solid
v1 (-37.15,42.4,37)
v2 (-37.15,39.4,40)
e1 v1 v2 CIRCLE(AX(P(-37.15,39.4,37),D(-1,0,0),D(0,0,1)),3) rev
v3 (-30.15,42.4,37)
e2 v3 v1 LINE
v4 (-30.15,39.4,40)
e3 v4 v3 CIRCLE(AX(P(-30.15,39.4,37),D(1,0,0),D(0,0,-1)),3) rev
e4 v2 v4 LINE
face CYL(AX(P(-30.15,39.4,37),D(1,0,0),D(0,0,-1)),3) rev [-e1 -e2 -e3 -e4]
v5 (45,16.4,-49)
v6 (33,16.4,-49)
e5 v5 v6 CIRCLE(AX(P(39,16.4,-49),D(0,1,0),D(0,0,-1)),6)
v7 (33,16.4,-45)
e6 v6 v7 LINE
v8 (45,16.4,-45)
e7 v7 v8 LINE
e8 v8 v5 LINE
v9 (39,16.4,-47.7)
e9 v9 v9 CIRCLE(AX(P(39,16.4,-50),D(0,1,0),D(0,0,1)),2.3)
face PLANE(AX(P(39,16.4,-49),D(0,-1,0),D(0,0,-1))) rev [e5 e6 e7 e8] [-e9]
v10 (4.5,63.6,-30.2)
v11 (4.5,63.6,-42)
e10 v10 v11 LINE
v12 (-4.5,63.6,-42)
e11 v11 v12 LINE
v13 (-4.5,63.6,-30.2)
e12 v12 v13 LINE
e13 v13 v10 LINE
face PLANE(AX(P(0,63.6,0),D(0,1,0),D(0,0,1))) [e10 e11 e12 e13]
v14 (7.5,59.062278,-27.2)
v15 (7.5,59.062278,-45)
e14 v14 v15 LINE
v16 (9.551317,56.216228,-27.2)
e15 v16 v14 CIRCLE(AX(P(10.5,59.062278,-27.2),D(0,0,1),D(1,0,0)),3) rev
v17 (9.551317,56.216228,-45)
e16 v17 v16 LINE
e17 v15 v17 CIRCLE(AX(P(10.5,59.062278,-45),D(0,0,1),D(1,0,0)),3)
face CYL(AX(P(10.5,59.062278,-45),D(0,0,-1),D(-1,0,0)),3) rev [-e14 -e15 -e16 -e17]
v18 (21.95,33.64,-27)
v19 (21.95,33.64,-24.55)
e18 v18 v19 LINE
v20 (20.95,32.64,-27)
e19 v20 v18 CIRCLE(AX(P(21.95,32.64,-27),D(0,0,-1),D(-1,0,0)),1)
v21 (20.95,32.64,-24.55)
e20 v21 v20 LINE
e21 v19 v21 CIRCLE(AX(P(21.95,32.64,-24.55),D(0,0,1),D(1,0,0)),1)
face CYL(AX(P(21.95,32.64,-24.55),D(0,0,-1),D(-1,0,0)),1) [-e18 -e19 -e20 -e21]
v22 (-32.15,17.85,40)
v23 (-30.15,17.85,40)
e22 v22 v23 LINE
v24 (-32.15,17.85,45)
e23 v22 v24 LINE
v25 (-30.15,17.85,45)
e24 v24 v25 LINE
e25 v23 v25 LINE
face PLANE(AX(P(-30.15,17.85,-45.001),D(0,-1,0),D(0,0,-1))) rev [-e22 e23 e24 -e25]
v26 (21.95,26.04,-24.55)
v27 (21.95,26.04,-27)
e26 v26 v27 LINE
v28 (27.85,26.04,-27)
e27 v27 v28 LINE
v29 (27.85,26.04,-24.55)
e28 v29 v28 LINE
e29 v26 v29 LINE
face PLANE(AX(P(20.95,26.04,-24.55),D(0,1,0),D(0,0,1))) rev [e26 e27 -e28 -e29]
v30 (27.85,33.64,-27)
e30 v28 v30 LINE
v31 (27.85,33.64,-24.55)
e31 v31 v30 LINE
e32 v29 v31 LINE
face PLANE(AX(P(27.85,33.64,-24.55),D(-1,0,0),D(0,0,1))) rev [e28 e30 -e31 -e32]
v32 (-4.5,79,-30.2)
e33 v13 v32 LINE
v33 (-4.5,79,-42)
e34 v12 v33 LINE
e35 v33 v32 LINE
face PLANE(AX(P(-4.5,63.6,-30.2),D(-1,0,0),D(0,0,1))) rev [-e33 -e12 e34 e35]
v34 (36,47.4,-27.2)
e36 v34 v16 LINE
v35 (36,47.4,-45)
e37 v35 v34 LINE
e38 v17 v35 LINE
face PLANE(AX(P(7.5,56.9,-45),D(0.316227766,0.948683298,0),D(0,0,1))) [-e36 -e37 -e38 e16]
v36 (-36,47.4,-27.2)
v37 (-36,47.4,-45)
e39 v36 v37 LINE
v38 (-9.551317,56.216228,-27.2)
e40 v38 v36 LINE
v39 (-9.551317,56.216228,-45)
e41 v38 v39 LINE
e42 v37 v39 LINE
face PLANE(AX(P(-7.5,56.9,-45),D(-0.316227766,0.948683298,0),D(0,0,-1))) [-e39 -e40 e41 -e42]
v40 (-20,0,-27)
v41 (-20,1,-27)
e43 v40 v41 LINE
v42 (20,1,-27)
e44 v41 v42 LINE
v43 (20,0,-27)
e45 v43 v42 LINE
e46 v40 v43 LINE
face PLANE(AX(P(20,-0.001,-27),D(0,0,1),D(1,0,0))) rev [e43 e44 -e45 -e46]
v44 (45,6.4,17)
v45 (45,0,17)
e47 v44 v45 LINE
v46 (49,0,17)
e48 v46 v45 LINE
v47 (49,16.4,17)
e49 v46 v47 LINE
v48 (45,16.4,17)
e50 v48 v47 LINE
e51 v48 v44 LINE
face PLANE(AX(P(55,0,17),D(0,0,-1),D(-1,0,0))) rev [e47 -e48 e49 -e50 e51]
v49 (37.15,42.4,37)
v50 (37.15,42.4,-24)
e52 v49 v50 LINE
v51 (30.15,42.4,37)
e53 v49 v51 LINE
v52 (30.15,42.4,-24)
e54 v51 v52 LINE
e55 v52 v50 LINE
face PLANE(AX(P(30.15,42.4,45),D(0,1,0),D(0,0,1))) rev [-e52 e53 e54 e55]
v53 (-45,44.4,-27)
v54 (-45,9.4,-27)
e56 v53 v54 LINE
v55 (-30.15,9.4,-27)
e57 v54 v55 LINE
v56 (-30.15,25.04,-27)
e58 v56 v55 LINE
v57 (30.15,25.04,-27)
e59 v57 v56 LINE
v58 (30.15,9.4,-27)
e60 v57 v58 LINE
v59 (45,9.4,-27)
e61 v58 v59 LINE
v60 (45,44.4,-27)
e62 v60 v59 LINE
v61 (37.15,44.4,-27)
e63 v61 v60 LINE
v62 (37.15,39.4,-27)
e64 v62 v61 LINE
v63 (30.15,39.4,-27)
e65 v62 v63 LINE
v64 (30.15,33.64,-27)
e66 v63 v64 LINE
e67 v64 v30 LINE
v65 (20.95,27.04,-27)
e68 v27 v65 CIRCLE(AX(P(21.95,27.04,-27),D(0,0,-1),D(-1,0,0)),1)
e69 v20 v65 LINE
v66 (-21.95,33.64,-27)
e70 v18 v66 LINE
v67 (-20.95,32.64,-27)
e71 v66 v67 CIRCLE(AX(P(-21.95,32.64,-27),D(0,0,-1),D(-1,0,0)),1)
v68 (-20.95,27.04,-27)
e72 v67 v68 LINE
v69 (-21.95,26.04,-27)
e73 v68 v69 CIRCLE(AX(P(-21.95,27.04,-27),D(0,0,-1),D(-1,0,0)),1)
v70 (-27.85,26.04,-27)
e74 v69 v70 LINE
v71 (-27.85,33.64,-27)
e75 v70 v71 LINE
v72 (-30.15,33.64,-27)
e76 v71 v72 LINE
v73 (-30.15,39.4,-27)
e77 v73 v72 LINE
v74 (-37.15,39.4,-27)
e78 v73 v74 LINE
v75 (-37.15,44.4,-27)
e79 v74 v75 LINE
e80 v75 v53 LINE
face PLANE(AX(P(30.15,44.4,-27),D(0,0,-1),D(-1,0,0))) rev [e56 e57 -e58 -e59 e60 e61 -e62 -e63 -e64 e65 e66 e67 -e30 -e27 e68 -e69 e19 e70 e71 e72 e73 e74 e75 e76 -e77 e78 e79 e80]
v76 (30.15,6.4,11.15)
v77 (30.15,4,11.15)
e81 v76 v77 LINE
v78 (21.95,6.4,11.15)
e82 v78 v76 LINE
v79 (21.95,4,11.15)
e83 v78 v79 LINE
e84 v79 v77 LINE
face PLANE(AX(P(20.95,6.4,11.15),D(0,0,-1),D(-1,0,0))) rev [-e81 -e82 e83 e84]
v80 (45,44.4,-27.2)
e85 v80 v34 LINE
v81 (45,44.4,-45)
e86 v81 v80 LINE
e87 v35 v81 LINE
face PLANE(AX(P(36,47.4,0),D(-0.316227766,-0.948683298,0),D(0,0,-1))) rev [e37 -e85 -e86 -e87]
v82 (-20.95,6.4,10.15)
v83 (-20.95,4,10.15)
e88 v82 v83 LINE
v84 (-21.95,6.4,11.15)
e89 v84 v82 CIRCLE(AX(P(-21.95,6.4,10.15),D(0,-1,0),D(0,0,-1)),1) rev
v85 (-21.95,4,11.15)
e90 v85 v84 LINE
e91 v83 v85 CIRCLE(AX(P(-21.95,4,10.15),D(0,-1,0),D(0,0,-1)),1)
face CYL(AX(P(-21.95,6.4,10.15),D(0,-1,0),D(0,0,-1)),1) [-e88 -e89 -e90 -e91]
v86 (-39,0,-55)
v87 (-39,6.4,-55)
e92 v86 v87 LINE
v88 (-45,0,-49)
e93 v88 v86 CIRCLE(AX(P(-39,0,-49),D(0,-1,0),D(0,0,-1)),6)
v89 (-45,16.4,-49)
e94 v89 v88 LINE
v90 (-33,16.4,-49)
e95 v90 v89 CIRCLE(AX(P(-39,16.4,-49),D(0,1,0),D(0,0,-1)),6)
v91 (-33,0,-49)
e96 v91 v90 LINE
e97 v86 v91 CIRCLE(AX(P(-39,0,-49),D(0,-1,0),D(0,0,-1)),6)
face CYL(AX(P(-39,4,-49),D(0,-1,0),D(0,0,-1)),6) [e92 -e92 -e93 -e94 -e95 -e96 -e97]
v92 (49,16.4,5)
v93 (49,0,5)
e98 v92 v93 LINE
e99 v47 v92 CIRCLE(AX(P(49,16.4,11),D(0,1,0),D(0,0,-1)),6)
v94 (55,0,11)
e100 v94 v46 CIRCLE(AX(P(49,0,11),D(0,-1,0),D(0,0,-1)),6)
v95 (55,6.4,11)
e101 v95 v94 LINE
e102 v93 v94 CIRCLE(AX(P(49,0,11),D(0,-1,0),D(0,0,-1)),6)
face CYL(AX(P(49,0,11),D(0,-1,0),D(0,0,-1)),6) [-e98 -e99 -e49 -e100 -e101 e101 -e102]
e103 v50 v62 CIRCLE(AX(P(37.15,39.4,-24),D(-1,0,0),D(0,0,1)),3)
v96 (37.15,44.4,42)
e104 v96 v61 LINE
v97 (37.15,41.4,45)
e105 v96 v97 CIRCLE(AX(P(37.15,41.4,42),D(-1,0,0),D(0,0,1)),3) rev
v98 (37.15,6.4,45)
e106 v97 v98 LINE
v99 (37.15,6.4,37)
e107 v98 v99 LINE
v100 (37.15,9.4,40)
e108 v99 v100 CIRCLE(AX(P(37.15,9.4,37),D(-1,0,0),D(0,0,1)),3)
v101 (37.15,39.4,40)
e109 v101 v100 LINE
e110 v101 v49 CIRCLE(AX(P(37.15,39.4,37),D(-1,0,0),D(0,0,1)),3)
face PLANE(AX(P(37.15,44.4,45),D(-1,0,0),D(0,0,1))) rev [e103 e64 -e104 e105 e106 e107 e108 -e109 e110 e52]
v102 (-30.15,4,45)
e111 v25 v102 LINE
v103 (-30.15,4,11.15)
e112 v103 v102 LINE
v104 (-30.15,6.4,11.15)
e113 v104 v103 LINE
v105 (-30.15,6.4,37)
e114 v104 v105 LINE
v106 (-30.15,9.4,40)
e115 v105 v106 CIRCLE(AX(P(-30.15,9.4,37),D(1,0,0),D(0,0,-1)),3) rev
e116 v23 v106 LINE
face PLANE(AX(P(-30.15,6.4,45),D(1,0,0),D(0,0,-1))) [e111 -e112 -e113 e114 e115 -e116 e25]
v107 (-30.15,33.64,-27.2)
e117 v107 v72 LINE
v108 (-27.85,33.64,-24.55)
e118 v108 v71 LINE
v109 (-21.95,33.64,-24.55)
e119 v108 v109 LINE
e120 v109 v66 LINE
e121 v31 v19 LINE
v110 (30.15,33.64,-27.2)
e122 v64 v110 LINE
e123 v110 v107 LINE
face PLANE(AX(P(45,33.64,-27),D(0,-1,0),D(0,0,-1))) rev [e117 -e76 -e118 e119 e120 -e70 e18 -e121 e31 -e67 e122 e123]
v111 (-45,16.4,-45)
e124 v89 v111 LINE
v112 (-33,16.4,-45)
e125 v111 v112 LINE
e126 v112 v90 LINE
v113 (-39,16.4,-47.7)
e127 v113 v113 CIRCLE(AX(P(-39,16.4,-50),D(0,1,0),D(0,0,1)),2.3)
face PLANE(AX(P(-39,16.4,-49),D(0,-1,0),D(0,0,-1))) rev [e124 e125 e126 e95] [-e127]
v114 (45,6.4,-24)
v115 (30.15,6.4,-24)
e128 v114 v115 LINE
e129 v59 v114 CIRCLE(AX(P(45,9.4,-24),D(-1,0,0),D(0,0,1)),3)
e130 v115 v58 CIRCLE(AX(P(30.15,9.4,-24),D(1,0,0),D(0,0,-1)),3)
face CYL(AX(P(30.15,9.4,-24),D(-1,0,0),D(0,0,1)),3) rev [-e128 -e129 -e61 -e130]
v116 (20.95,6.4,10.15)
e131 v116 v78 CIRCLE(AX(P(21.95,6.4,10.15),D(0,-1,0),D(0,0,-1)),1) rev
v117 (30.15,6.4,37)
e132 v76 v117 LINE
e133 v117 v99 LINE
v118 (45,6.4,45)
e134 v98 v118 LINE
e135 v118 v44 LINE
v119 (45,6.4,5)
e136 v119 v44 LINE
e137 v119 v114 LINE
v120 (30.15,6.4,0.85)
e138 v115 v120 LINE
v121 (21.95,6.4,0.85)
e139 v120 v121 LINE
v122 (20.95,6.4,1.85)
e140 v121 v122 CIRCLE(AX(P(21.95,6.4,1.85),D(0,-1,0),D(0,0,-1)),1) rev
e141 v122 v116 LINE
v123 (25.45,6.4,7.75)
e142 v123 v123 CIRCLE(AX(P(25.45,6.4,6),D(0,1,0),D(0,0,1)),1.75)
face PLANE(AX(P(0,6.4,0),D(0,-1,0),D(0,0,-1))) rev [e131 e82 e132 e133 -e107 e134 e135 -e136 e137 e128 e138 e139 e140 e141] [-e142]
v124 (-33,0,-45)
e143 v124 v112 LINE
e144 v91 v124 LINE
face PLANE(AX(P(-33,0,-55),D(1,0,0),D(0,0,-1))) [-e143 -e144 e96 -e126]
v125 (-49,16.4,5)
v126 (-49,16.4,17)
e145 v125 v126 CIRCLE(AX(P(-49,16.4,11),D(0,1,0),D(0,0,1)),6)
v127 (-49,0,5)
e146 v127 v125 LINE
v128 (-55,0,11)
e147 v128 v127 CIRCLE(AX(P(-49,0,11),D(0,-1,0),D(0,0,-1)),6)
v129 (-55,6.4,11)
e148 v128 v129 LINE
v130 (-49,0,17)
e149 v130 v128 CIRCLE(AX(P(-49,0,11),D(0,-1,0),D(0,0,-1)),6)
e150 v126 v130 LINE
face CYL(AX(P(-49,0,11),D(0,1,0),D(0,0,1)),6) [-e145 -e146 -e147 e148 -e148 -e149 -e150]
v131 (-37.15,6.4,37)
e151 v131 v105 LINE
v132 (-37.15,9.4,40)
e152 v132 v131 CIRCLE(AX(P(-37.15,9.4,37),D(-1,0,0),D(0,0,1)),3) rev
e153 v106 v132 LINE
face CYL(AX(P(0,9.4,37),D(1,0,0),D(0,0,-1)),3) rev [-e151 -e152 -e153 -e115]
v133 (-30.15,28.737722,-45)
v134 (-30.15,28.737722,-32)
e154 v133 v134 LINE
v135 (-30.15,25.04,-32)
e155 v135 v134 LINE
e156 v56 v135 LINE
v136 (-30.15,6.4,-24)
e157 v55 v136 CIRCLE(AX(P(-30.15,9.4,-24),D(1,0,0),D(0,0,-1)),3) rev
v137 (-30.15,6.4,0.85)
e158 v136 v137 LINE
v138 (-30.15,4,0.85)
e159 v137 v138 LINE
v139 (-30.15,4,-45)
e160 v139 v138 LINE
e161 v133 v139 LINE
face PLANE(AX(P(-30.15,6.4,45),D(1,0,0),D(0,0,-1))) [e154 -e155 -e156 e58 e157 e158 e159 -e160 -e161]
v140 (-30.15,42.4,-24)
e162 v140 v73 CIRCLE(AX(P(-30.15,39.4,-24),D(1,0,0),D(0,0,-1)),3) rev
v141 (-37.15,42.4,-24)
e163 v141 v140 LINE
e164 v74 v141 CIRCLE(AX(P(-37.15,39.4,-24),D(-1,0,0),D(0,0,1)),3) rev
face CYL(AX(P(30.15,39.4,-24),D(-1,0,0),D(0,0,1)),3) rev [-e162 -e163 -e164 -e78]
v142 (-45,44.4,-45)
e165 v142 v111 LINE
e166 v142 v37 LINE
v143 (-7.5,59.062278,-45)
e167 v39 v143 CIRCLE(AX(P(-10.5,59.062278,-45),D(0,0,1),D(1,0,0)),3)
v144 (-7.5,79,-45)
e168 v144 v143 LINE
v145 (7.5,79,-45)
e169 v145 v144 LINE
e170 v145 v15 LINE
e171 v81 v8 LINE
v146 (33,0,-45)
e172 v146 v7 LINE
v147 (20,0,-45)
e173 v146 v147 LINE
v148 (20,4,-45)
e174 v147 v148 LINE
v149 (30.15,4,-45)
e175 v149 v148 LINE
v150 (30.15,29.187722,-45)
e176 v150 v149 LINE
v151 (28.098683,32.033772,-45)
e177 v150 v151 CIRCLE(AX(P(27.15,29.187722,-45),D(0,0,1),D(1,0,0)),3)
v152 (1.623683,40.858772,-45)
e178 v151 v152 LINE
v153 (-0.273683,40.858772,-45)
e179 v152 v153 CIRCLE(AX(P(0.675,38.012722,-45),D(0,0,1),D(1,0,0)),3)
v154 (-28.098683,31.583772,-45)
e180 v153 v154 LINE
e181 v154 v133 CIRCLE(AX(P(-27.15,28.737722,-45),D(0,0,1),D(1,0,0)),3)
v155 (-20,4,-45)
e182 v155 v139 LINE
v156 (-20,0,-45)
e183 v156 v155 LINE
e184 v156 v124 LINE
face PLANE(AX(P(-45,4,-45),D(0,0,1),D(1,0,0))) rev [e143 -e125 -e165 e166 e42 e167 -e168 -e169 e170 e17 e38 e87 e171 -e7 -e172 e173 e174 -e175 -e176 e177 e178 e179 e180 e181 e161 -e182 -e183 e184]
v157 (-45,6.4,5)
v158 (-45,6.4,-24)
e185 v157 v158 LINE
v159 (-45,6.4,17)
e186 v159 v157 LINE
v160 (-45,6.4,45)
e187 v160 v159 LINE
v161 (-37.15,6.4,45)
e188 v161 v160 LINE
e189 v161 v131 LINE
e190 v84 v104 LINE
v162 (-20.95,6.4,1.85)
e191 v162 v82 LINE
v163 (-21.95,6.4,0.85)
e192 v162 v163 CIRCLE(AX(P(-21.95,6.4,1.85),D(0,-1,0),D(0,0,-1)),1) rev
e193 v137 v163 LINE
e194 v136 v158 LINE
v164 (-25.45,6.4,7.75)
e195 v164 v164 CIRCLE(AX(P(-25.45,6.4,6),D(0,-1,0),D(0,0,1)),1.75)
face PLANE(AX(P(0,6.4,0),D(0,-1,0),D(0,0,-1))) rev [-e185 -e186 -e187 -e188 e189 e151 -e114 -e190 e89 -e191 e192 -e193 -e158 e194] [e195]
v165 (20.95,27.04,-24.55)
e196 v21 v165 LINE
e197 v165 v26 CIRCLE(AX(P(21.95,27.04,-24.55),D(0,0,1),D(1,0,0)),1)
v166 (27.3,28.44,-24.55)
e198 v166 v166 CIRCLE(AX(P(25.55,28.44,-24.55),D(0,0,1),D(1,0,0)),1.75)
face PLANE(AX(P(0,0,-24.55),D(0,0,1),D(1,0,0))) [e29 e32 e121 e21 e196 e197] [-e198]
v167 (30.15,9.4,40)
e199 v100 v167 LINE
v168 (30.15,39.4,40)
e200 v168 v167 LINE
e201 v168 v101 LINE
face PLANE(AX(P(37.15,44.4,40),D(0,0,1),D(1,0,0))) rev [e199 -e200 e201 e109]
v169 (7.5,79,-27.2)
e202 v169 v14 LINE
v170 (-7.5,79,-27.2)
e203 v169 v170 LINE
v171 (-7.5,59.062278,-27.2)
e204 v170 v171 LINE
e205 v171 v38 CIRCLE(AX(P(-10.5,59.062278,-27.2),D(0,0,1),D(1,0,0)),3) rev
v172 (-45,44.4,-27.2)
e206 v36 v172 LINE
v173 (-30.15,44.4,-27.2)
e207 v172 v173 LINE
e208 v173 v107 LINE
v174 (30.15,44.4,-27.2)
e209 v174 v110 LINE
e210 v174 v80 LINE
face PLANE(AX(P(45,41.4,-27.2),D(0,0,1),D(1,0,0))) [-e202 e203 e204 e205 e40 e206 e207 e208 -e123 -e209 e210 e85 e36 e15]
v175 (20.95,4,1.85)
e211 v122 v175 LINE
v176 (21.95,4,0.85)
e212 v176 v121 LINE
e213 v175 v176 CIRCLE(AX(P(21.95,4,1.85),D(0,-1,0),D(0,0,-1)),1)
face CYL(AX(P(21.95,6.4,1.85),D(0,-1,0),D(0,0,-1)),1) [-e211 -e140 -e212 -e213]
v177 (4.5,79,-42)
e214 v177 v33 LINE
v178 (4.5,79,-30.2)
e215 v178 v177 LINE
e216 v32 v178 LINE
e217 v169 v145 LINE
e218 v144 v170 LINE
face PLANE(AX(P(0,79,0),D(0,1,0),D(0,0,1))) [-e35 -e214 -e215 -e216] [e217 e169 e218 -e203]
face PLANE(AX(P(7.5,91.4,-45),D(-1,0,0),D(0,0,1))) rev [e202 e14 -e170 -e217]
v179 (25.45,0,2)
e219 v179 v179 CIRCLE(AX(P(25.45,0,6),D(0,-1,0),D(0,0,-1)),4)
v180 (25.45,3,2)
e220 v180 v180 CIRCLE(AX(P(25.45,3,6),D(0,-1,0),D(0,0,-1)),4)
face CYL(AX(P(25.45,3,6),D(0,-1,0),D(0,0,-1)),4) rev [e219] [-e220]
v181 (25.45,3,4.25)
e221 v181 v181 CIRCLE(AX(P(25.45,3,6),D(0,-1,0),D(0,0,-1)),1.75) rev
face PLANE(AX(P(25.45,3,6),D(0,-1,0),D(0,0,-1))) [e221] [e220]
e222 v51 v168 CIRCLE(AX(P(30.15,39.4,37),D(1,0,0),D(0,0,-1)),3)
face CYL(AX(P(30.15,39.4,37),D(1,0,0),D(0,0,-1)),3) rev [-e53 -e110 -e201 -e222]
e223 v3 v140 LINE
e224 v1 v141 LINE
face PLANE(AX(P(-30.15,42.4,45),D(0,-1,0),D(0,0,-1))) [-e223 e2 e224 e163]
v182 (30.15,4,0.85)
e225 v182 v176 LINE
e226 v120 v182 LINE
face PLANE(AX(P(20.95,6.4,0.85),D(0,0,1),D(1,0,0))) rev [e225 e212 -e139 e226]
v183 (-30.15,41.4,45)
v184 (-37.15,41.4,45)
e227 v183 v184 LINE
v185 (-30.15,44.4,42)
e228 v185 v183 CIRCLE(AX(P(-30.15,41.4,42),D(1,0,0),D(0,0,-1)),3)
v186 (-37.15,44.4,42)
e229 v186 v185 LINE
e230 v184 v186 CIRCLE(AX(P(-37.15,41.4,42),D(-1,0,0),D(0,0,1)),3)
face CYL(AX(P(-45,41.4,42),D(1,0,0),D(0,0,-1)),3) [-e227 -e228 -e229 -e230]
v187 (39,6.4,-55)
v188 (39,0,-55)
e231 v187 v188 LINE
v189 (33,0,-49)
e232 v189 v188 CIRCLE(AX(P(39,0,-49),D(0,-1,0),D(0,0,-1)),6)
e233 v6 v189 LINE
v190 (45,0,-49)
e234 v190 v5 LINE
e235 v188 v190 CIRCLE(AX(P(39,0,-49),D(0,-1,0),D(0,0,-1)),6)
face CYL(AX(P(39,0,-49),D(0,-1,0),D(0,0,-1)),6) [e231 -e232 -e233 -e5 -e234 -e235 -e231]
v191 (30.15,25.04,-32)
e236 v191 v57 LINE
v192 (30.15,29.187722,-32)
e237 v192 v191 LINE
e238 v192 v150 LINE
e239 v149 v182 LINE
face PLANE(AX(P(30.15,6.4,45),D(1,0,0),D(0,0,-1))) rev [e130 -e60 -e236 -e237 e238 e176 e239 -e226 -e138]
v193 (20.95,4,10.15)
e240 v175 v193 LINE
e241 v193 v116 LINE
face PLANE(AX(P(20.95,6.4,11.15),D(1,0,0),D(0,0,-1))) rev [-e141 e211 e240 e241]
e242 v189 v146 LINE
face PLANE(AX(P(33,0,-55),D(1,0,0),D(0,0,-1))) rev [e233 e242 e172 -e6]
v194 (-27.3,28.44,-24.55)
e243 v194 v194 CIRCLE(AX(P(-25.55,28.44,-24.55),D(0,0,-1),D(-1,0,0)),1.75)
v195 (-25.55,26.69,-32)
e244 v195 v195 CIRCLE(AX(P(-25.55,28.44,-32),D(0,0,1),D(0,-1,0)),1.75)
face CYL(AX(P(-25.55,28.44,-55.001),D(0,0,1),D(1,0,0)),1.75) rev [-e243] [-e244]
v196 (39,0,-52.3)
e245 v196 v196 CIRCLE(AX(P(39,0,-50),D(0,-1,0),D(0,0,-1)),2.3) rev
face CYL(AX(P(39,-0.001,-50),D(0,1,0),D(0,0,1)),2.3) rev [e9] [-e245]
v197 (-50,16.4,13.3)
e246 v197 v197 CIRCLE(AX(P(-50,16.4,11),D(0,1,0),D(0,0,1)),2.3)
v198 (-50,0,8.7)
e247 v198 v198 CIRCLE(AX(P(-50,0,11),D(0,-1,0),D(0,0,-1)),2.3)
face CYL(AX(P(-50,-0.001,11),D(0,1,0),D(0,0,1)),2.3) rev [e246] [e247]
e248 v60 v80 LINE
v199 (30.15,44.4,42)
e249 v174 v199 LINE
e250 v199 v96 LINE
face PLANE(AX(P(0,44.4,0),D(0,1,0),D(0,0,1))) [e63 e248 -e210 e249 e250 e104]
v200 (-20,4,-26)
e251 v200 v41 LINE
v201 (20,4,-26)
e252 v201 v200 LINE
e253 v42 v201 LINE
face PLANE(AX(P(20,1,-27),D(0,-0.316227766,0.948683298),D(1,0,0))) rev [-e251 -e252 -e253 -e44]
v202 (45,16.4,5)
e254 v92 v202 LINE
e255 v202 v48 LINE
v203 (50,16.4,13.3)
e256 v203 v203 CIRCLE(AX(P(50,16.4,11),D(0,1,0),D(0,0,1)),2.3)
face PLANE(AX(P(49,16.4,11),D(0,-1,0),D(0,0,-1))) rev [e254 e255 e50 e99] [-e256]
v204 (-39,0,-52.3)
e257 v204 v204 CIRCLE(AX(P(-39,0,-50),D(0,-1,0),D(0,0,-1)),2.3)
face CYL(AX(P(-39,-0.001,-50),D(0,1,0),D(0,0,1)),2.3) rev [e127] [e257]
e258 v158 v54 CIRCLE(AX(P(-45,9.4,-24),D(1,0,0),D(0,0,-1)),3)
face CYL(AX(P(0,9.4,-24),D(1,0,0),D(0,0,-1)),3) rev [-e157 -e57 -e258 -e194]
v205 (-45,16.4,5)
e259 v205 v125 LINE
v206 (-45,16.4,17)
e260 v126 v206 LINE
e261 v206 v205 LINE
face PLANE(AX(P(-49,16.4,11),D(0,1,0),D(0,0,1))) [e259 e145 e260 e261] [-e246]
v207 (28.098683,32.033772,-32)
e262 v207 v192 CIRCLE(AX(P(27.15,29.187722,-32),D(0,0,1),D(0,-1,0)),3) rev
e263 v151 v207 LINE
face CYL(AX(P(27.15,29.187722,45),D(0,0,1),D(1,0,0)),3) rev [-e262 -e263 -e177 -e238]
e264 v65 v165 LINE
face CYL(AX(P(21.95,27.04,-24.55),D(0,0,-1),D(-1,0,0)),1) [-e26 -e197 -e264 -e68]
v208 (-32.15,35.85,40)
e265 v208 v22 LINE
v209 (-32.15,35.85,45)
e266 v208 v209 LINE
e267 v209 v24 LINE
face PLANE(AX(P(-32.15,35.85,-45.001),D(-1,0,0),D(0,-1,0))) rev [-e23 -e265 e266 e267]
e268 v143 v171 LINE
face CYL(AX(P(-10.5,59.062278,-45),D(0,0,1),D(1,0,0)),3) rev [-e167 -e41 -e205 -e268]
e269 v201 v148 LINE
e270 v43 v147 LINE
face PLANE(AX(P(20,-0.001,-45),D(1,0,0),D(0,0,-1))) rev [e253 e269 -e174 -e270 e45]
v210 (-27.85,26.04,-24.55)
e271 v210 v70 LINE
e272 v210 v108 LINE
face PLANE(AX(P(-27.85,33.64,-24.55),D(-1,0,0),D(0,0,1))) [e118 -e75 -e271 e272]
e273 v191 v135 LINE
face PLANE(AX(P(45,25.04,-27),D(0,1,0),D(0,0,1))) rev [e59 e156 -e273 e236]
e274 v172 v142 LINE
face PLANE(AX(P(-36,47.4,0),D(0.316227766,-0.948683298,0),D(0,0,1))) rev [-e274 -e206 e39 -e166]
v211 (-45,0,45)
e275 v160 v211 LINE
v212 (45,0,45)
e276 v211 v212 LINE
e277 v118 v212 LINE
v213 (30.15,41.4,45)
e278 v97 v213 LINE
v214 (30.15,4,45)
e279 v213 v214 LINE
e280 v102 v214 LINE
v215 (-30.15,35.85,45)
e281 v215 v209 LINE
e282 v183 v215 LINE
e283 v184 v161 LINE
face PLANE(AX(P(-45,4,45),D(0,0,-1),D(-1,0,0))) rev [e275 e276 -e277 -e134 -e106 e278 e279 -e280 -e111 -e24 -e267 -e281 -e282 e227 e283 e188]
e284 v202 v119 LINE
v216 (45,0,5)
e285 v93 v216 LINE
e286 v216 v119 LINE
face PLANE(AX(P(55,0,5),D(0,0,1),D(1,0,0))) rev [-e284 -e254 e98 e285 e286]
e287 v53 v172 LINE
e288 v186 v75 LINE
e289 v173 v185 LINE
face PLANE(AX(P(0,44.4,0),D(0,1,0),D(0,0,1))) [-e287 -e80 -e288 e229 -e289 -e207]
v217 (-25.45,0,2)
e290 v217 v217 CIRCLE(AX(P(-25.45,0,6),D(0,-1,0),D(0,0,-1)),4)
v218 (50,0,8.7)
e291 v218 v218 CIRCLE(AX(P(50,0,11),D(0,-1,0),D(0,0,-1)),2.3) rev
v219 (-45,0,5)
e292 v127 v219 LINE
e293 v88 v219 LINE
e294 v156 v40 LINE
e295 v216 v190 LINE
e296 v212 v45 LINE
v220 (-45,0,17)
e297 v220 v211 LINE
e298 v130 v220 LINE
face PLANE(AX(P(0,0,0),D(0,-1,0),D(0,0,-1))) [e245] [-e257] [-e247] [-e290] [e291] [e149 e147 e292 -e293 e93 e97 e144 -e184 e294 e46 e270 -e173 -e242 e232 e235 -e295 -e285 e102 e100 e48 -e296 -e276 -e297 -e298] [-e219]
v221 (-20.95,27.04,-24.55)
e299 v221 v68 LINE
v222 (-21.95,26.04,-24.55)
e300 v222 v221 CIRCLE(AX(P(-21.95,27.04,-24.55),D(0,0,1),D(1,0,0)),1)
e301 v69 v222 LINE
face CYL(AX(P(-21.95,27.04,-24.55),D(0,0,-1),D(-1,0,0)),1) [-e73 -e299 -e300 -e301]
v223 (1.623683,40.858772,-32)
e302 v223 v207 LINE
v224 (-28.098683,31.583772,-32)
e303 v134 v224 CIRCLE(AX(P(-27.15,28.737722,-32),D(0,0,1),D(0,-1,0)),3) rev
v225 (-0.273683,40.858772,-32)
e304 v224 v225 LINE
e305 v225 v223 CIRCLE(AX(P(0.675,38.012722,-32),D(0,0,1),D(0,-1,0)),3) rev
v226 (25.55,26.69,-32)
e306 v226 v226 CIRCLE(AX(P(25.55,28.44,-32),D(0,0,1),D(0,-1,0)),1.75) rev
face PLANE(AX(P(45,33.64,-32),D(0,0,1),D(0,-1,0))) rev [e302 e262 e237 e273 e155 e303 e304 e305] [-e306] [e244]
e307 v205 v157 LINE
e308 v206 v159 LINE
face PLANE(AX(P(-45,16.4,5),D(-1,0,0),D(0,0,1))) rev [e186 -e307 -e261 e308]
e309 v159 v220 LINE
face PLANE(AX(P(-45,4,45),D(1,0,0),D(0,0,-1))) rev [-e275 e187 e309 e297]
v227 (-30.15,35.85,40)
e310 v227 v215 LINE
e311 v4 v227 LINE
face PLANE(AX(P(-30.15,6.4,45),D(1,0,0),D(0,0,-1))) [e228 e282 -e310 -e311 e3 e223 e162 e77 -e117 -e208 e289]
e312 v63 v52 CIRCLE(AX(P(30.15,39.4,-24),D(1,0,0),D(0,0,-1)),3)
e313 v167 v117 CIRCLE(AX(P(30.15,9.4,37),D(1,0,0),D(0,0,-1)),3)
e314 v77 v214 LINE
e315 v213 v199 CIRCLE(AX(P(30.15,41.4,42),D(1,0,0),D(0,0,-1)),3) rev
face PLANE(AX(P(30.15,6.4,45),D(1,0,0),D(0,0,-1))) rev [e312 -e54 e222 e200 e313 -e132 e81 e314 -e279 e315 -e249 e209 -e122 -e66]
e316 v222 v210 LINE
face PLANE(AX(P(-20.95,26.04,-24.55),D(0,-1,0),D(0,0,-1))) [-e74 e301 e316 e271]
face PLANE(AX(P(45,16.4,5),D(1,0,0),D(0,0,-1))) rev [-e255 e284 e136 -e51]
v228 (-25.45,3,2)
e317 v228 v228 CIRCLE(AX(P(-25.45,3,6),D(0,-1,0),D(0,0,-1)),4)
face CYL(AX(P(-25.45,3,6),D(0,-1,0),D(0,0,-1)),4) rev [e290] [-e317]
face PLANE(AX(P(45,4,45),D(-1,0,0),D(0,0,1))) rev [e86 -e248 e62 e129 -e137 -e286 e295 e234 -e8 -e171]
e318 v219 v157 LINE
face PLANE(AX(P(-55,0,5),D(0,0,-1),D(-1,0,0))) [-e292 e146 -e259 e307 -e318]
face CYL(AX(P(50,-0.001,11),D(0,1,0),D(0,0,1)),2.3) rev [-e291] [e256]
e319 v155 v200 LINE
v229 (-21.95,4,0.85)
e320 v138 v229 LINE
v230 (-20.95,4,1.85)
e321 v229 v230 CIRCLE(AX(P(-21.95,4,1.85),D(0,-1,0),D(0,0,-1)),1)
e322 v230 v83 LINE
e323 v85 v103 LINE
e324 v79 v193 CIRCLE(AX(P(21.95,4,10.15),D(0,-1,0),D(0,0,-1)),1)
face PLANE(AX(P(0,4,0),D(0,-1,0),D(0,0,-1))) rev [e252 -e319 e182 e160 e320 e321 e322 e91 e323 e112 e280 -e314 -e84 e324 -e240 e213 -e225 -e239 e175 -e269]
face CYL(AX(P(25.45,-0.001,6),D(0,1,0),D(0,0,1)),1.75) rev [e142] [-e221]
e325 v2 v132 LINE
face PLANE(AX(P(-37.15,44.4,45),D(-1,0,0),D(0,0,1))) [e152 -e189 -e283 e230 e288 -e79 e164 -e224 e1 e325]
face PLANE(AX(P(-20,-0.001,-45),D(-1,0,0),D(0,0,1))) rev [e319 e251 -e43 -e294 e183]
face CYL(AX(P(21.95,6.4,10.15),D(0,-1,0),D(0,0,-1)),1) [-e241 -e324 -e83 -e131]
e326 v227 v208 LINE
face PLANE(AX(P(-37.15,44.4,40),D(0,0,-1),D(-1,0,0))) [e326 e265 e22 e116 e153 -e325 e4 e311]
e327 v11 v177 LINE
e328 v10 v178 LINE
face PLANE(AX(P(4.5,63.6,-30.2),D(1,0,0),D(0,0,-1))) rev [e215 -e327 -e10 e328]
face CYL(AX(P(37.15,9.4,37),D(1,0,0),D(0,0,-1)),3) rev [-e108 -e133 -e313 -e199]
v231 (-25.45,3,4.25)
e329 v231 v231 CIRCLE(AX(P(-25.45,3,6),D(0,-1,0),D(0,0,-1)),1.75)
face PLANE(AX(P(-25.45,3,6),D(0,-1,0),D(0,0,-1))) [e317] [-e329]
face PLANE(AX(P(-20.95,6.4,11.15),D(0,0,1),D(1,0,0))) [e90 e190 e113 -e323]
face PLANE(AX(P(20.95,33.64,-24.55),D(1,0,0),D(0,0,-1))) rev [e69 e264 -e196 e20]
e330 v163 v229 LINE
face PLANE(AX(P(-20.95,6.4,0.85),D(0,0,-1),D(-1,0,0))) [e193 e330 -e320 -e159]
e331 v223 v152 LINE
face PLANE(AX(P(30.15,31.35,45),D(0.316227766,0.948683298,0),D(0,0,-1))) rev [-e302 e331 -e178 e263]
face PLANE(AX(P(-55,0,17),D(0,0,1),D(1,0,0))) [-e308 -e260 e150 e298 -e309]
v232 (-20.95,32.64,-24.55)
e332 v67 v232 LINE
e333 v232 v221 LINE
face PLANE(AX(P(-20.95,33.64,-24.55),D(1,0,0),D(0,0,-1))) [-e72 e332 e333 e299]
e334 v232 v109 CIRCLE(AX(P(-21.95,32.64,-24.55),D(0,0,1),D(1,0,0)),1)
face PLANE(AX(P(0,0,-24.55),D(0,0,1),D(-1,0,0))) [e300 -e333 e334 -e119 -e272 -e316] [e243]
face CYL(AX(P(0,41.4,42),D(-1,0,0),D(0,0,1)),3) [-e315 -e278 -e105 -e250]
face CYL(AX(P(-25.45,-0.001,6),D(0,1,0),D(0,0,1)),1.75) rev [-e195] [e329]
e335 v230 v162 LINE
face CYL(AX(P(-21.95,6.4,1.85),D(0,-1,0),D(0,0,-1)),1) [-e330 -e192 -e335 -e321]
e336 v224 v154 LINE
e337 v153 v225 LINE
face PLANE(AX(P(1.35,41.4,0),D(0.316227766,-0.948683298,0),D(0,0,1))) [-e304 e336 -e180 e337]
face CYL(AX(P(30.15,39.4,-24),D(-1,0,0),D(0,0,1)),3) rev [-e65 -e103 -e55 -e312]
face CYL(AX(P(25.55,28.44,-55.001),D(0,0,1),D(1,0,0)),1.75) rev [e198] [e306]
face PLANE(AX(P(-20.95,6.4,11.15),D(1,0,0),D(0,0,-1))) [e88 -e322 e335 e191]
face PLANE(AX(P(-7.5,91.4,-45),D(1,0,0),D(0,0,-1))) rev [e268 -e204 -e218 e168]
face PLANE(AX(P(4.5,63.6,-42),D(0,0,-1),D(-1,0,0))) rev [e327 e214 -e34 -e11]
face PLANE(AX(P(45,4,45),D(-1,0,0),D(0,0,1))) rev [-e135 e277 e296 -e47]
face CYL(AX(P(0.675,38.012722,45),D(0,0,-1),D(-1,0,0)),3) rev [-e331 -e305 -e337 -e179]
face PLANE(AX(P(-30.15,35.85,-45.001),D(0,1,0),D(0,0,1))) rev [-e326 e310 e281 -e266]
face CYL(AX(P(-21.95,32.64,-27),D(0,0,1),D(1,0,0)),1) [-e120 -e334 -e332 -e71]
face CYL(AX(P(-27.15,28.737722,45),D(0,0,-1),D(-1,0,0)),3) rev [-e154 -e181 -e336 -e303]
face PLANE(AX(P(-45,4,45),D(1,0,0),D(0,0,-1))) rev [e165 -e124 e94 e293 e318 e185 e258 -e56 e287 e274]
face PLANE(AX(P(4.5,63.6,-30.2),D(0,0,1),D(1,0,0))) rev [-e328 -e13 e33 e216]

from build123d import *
from OCP.BRepFilletAPI import BRepFilletAPI_MakeChamfer

# Parameters (mm, degrees)
ESQUISSE2_W              = 90
ESQUISSE2_H              = 90
BOSS_EXTRU_1_DEPTH       = 4
ESQUISSE3_W              = 9.2
ESQUISSE3_H              = 10.3
BOSS_EXTRU_2_DEPTH       = 2.4
CONG_1_R                 = 1
ESQUISSE5_W              = 14.85
ESQUISSE5_H              = 90
BOSS_EXTRU_3_DEPTH       = 2.4
ESQUISSE6_W              = 7
ESQUISSE6_H              = 5
BOSS_EXTRU_4_DEPTH       = 38
ESQUISSE8_W              = 14.85
ESQUISSE8_H              = 18
BOSS_EXTRU_5_DEPTH       = 38
BOSS_EXTRU_6_REACH       = 97.814
ESQUISSE9_W              = 7
ESQUISSE9_H              = 2
CONG_1_OF_SYM_TRIE1_R    = 1
ENL_V_MAT_EXTRU_1_REACH  = 111.983
ESQUISSE10_W             = 2
ESQUISSE10_H             = 18
ENL_V_MAT_EXTRU_2_REACH  = 77.38
ESQUISSE11_W             = 40
ESQUISSE11_H             = 18
BOSS_EXTRU_7_REACH       = 100.203
ESQUISSE12_W             = 5
ESQUISSE12_H             = 8.6
ESQUISSE13_W             = 6.9
ESQUISSE13_H             = 7.6
BOSS_EXTRU_8_DEPTH       = 2.45
CONG_2_R                 = 1
CONG_2_OF_SYM_TRIE2_R    = 1
BOSS_EXTRU_9_DEPTH       = 3
BOSS_EXTRU_9_DEPTH_BACK  = 3
ESQUISSE14_W             = 90
ESQUISSE14_H             = 17.8
ESQUISSE15_W             = 15
ESQUISSE15_H             = 17.8
BOSS_EXTRU_10_DEPTH      = 44
ESQUISSE16_W             = 90
ESQUISSE16_H             = 90
BOSS_EXTRU_11_DEPTH      = 11.6
ESQUISSE20_W             = 12
ESQUISSE20_H             = 6.4
BOSS_EXTRU_13_DEPTH      = 10
ESQUISSE21_W             = 12
ESQUISSE21_H             = 6.4
BOSS_EXTRU_14_DEPTH      = 10
CONG_3_R                 = 6
ENL_V_MAT_EXTRU_4_REACH  = 126.022
ESQUISSE23_R             = 2.3
CONG_3_OF_SYM_TRIE3_R    = 6
ENL_V_MAT_EXTRU_5_REACH  = 126.022
ESQUISSE24_R             = 1.75
ENL_V_MAT_EXTRU_6_REACH  = 137.909
ESQUISSE26_R             = 1.75
ESQUISSE27_W             = 50
ESQUISSE27_H             = 4
ENL_V_MAT_EXTRU_7_DEPTH  = 72.2
CHANFREIN3_SIZE          = 28.5
CHANFREIN3_SIZE2         = 9.5
CHANFREIN4_SIZE          = 10
CHANFREIN4_SIZE2         = 17.5
CHANFREIN8_START         = -45
CHANFREIN8_DEPTH         = 17.8
CHANFREIN9_SIZE          = 3
CHANFREIN9_SIZE_2        = 9
CHANFREIN10_START        = 25.930676813
CHANFREIN10_OUTLINE_W    = 40
CHANFREIN10_OUTLINE_H    = 3.16227766
CHANFREIN10_DEPTH        = 2.069323187
CONG_9_R                 = 3
ESQUISSE37_R             = 4
ENL_V_MAT_EXTRU_8_DEPTH  = 3
BOSS_EXTRU_15_DEPTH      = 4.8
CONG_11_R                = 3
CHANFREIN14_SIZE         = 10
CHANFREIN14_SIZE2        = 5
ESQUISSE40_W             = 90
ESQUISSE40_H             = 90
ENL_V_MAT_EXTRU_9_DEPTH  = 24
ESQUISSE41_W             = 9
ESQUISSE41_H             = 11.8
ENL_V_MAT_EXTRU_11_DEPTH = 15.4
BOSS_EXTRU_16_START      = 10
ESQUISSE42_R             = 2.3
BOSS_EXTRU_16_DEPTH      = 10


with BuildPart() as part:
    # Esquisse2 → Boss.-Extru.1 (new body)
    with BuildSketch(Plane(origin=(0, 0, 0), x_dir=(1, 0, 0), z_dir=(0, 1, 0))):
        Rectangle(ESQUISSE2_W, ESQUISSE2_H)
    extrude(amount=BOSS_EXTRU_1_DEPTH)

    # Esquisse3 → Boss.-Extru.2 (add)
    with BuildSketch(Plane(origin=(0, 4, 0), x_dir=(1, 0, 0), z_dir=(0, 1, 0))):
        with Locations((25.55, -6)):
            Rectangle(ESQUISSE3_W, ESQUISSE3_H)
    boss_extru_2 = extrude(amount=BOSS_EXTRU_2_DEPTH)

    # Congé1
    cong_1_edges = [part.edges().sort_by_distance(p)[0] for p in [
        (20.95, 5.2, 0.85),
        (20.95, 5.2, 11.15),
    ]]
    fillet(cong_1_edges, radius=CONG_1_R)

    # Esquisse5 → Boss.-Extru.3 (add)
    with BuildSketch(Plane(origin=(0, 4, 0), x_dir=(1, 0, 0), z_dir=(0, 1, 0))):
        with Locations((37.575, 0)):
            Rectangle(ESQUISSE5_W, ESQUISSE5_H)
    boss_extru_3 = extrude(amount=BOSS_EXTRU_3_DEPTH)

    # Esquisse6 → Boss.-Extru.4 (add)
    with BuildSketch(Plane(origin=(0, 6.4, 0), x_dir=(1, 0, 0), z_dir=(0, 1, 0))):
        with Locations((33.65, -42.5)):
            Rectangle(ESQUISSE6_W, ESQUISSE6_H)
    boss_extru_4 = extrude(amount=BOSS_EXTRU_4_DEPTH)

    # Esquisse8 → Boss.-Extru.5 (add)
    with BuildSketch(Plane(origin=(0, 6.4, 0), x_dir=(1, 0, 0), z_dir=(0, 1, 0))):
        with Locations((37.575, 36)):
            Rectangle(ESQUISSE8_W, ESQUISSE8_H)
    boss_extru_5 = extrude(amount=BOSS_EXTRU_5_DEPTH)

    # Esquisse9 → Boss.-Extru.6 (add, up to next)
    with BuildSketch(Plane.XY.offset(-27), mode=Mode.PRIVATE) as boss_extru_6_sk1:
        with Locations((33.65, 43.4)):
            Rectangle(ESQUISSE9_W, ESQUISSE9_H)
    boss_extru_6_tool1 = extrude(boss_extru_6_sk1.sketch, amount=BOSS_EXTRU_6_REACH, mode=Mode.PRIVATE) - part.part
    boss_extru_6 = boss_extru_6_tool1.solids().sort_by_distance((33.65, 43.4, -27))[0]
    add(boss_extru_6)

    # Symétrie1: Boss.-Extru.2, Boss.-Extru.3, Boss.-Extru.4, Boss.-Extru.5, Boss.-Extru.6 across plane
    add(boss_extru_2.mirror(Plane(origin=(0, 0, 0), x_dir=(0, 0, 1), z_dir=(1, 0, 0))))
    add(boss_extru_3.mirror(Plane(origin=(0, 0, 0), x_dir=(0, 0, 1), z_dir=(1, 0, 0))))
    add(boss_extru_4.mirror(Plane(origin=(0, 0, 0), x_dir=(0, 0, 1), z_dir=(1, 0, 0))))
    add(boss_extru_5.mirror(Plane(origin=(0, 0, 0), x_dir=(0, 0, 1), z_dir=(1, 0, 0))))
    add(boss_extru_6.mirror(Plane(origin=(0, 0, 0), x_dir=(0, 0, 1), z_dir=(1, 0, 0))))

    # Congé1 of Symétrie1
    cong_1_of_sym_trie1_edges = [part.edges().sort_by_distance(p)[0] for p in [
        (-20.95, 5.2, 0.85),
        (-20.95, 5.2, 11.15),
    ]]
    fillet(cong_1_of_sym_trie1_edges, radius=CONG_1_OF_SYM_TRIE1_R)

    # Esquisse10 → Enlèv. mat.-Extru.1 (cut, up to next)
    with BuildSketch(Plane.XY.offset(45), mode=Mode.PRIVATE) as enl_v_mat_extru_1_sk1:
        with Locations((-31.15, 26.85)):
            Rectangle(ESQUISSE10_W, ESQUISSE10_H)
    enl_v_mat_extru_1_tool1 = extrude(enl_v_mat_extru_1_sk1.sketch, amount=-ENL_V_MAT_EXTRU_1_REACH, mode=Mode.PRIVATE) & part.part
    add(enl_v_mat_extru_1_tool1.solids().sort_by_distance((-31.15, 26.85, 45))[0], mode=Mode.SUBTRACT)

    # Esquisse11 → Enlèv. mat.-Extru.2 (cut, up to next)
    with BuildSketch(Plane(origin=(0, 4, 0), x_dir=(1, 0, 0), z_dir=(0, 1, 0)), mode=Mode.PRIVATE) as enl_v_mat_extru_2_sk1:
        with Locations((0, 36)):
            Rectangle(ESQUISSE11_W, ESQUISSE11_H)
    enl_v_mat_extru_2_tool1 = extrude(enl_v_mat_extru_2_sk1.sketch, amount=-ENL_V_MAT_EXTRU_2_REACH, mode=Mode.PRIVATE) & part.part
    add(enl_v_mat_extru_2_tool1.solids().sort_by_distance((0, 4, -36))[0], mode=Mode.SUBTRACT)

    # Esquisse12 → Boss.-Extru.7 (add, up to next)
    with BuildSketch(Plane(origin=(-30.15, 0, 0), x_dir=(0, 0, -1), z_dir=(1, 0, 0)), mode=Mode.PRIVATE) as boss_extru_7_sk1:
        with Locations((29.5, 29.34)):
            Rectangle(ESQUISSE12_W, ESQUISSE12_H)
    boss_extru_7_tool1 = extrude(boss_extru_7_sk1.sketch, amount=BOSS_EXTRU_7_REACH, mode=Mode.PRIVATE) - part.part
    add(boss_extru_7_tool1.solids().sort_by_distance((-30.15, 29.34, -29.5))[0])

    # Esquisse13 → Boss.-Extru.8 (add)
    with BuildSketch(Plane.XY.offset(-27)):
        with Locations((24.4, 29.84)):
            Rectangle(ESQUISSE13_W, ESQUISSE13_H)
    boss_extru_8 = extrude(amount=BOSS_EXTRU_8_DEPTH)

    # Congé2
    cong_2_edges = [part.edges().sort_by_distance(p)[0] for p in [
        (20.95, 33.64, -25.775),
        (20.95, 26.04, -25.775),
    ]]
    fillet(cong_2_edges, radius=CONG_2_R)

    # Symétrie2: Boss.-Extru.8 across plane
    add(boss_extru_8.mirror(Plane(origin=(0, 0, 0), x_dir=(0, 0, 1), z_dir=(1, 0, 0))))

    # Congé2 of Symétrie2
    cong_2_of_sym_trie2_edges = [part.edges().sort_by_distance(p)[0] for p in [
        (-20.95, 33.64, -25.775),
        (-20.95, 26.04, -25.775),
    ]]
    fillet(cong_2_of_sym_trie2_edges, radius=CONG_2_OF_SYM_TRIE2_R)

    # Esquisse14 → Boss.-Extru.9 (add, two sides: drawn at the far end of the back side and taken through both)
    with BuildSketch(Plane(origin=(0, 44.4, 0), x_dir=(1, 0, 0), z_dir=(0, 1, 0)).offset(-BOSS_EXTRU_9_DEPTH_BACK)):
        with Locations((0, 36.1)):
            Rectangle(ESQUISSE14_W, ESQUISSE14_H)
    extrude(amount=BOSS_EXTRU_9_DEPTH + BOSS_EXTRU_9_DEPTH_BACK)

    # Esquisse15 → Boss.-Extru.10 (add)
    with BuildSketch(Plane(origin=(0, 47.4, 0), x_dir=(1, 0, 0), z_dir=(0, 1, 0))):
        with Locations((0, 36.1)):
            Rectangle(ESQUISSE15_W, ESQUISSE15_H)
    extrude(amount=BOSS_EXTRU_10_DEPTH)

    # Esquisse16 → Boss.-Extru.11 (add)
    with BuildSketch(Plane(origin=(0, 91.4, 0), x_dir=(1, 0, 0), z_dir=(0, 1, 0))):
        Rectangle(ESQUISSE16_W, ESQUISSE16_H)
    extrude(amount=BOSS_EXTRU_11_DEPTH)

    # Esquisse20 → Boss.-Extru.13 (add)
    with BuildSketch(Plane(origin=(45, 0, 0), x_dir=(0, 0, -1), z_dir=(1, 0, 0))):
        with Locations((-11, 3.2)):
            Rectangle(ESQUISSE20_W, ESQUISSE20_H)
    boss_extru_13 = extrude(amount=BOSS_EXTRU_13_DEPTH)

    # Esquisse21 → Boss.-Extru.14 (add)
    with BuildSketch(Plane(origin=(0, 0, -45), x_dir=(-1, 0, 0), z_dir=(0, 0, -1))):
        with Locations((-39, 3.2)):
            Rectangle(ESQUISSE21_W, ESQUISSE21_H)
    boss_extru_14 = extrude(amount=BOSS_EXTRU_14_DEPTH)

    # Congé3
    cong_3_edges = [part.edges().sort_by_distance(p)[0] for p in [
        (33, 3.2, -55),
        (45, 3.2, -55),
        (55, 3.2, 5),
        (55, 3.2, 17),
    ]]
    fillet(cong_3_edges, radius=CONG_3_R - 0.0001)  # a hair under: the kernel refuses the full size

    # Esquisse23 → Enlèv. mat.-Extru.4 (cut, up to next)
    with BuildSketch(Plane(origin=(0, 6.4, 0), x_dir=(1, 0, 0), z_dir=(0, 1, 0)), mode=Mode.PRIVATE) as enl_v_mat_extru_4_sk1:
        with Locations(Location((50, -11, 0), (0, 0, 270))):
            Circle(ESQUISSE23_R)
    enl_v_mat_extru_4_tool1 = extrude(enl_v_mat_extru_4_sk1.sketch, amount=-ENL_V_MAT_EXTRU_4_REACH, mode=Mode.PRIVATE) & part.part
    # Esquisse23 → Enlèv. mat.-Extru.4 (cut, up to next)
    with BuildSketch(Plane(origin=(0, 6.4, 0), x_dir=(1, 0, 0), z_dir=(0, 1, 0)), mode=Mode.PRIVATE) as enl_v_mat_extru_4_sk2:
        with Locations(Location((39, 50, 0), (0, 0, 270))):
            Circle(ESQUISSE23_R)
    enl_v_mat_extru_4_tool2 = extrude(enl_v_mat_extru_4_sk2.sketch, amount=-ENL_V_MAT_EXTRU_4_REACH, mode=Mode.PRIVATE) & part.part
    enl_v_mat_extru_4_1 = enl_v_mat_extru_4_tool1.solids().sort_by_distance((50, 6.4, 11))[0]
    add(enl_v_mat_extru_4_1, mode=Mode.SUBTRACT)
    enl_v_mat_extru_4_2 = enl_v_mat_extru_4_tool2.solids().sort_by_distance((39, 6.4, -50))[0]
    add(enl_v_mat_extru_4_2, mode=Mode.SUBTRACT)
    enl_v_mat_extru_4 = enl_v_mat_extru_4_1 + enl_v_mat_extru_4_2  # Enlèv. mat.-Extru.4 as one shape, for the pattern or mirror that repeats it

    # Symétrie3: Boss.-Extru.13, Boss.-Extru.14, Enlèv. mat.-Extru.4 across plane
    add(boss_extru_13.mirror(Plane(origin=(0, 0, 0), x_dir=(0, 0, 1), z_dir=(1, 0, 0))))
    add(boss_extru_14.mirror(Plane(origin=(0, 0, 0), x_dir=(0, 0, 1), z_dir=(1, 0, 0))))
    add(enl_v_mat_extru_4.mirror(Plane(origin=(0, 0, 0), x_dir=(0, 0, 1), z_dir=(1, 0, 0))), mode=Mode.SUBTRACT)

    # Congé3 of Symétrie3
    cong_3_of_sym_trie3_edges = [part.edges().sort_by_distance(p)[0] for p in [
        (-33, 3.2, -55),
        (-45, 3.2, -55),
        (-55, 3.2, 5),
        (-55, 3.2, 17),
    ]]
    fillet(cong_3_of_sym_trie3_edges, radius=CONG_3_OF_SYM_TRIE3_R - 0.0001)  # a hair under: the kernel refuses the full size

    # Esquisse24 → Enlèv. mat.-Extru.5 (cut, up to next)
    with BuildSketch(Plane(origin=(0, 6.4, 0), x_dir=(1, 0, 0), z_dir=(0, 1, 0)), mode=Mode.PRIVATE) as enl_v_mat_extru_5_sk1:
        with Locations(Location((25.45, -6, 0), (0, 0, 270))):
            Circle(ESQUISSE24_R)
    enl_v_mat_extru_5_tool1 = extrude(enl_v_mat_extru_5_sk1.sketch, amount=-ENL_V_MAT_EXTRU_5_REACH, mode=Mode.PRIVATE) & part.part
    enl_v_mat_extru_5 = enl_v_mat_extru_5_tool1.solids().sort_by_distance((25.45, 6.4, 6))[0]
    add(enl_v_mat_extru_5, mode=Mode.SUBTRACT)

    # Esquisse26 → Enlèv. mat.-Extru.6 (cut, up to next)
    with BuildSketch(Plane.XY.offset(-24.55), mode=Mode.PRIVATE) as enl_v_mat_extru_6_sk1:
        with Locations((25.55, 28.44)):
            Circle(ESQUISSE26_R)
    enl_v_mat_extru_6_tool1 = extrude(enl_v_mat_extru_6_sk1.sketch, amount=-ENL_V_MAT_EXTRU_6_REACH, mode=Mode.PRIVATE) & part.part
    enl_v_mat_extru_6 = enl_v_mat_extru_6_tool1.solids().sort_by_distance((25.55, 28.44, -24.55))[0]
    add(enl_v_mat_extru_6, mode=Mode.SUBTRACT)

    # Symétrie5: Enlèv. mat.-Extru.5, Enlèv. mat.-Extru.6 across plane
    add(enl_v_mat_extru_5.mirror(Plane(origin=(0, 0, 0), x_dir=(0, 0, 1), z_dir=(1, 0, 0))), mode=Mode.SUBTRACT)
    add(enl_v_mat_extru_6.mirror(Plane(origin=(0, 0, 0), x_dir=(0, 0, 1), z_dir=(1, 0, 0))), mode=Mode.SUBTRACT)

    # Esquisse27 → Enlèv. mat.-Extru.7 (cut)
    with BuildSketch(Plane.XY.offset(45)):
        with Locations((0, 93.4)):
            Rectangle(ESQUISSE27_W, ESQUISSE27_H)
    extrude(amount=-ENL_V_MAT_EXTRU_7_DEPTH, mode=Mode.SUBTRACT)

    # Chanfrein3: one chamfer whose edges measure the first distance from different faces: ONE call of the kernel's chamfer builder (chamfer() names one face for all edges)
    chanfrein3_edges_1 = [part.edges().sort_by_distance(p)[0] for p in [
        (-7.5, 47.4, -36.1),
    ]]
    chanfrein3_side_1 = [part.faces().sort_by_distance(p)[0] for p in [
        (-26.25, 47.4, -36.1),
    ]]
    chanfrein3_edges_2 = [part.edges().sort_by_distance(p)[0] for p in [
        (7.5, 47.4, -36.1),
    ]]
    chanfrein3_side_2 = [part.faces().sort_by_distance(p)[0] for p in [
        (26.25, 47.4, -36.1),
    ]]
    chanfrein3 = BRepFilletAPI_MakeChamfer(part.part.solid().wrapped)
    for e in chanfrein3_edges_1:
        chanfrein3.Add(CHANFREIN3_SIZE, CHANFREIN3_SIZE2, e.wrapped, chanfrein3_side_1[0].wrapped)  # the first distance lies on this face
    for e in chanfrein3_edges_2:
        chanfrein3.Add(CHANFREIN3_SIZE, CHANFREIN3_SIZE2, e.wrapped, chanfrein3_side_2[0].wrapped)  # the first distance lies on this face
    add(Compound.cast(chanfrein3.Shape()), mode=Mode.REPLACE)

    # Chanfrein4: one chamfer whose edges measure the first distance from different faces: ONE call of the kernel's chamfer builder (chamfer() names one face for all edges)
    chanfrein4_edges_1 = [part.edges().sort_by_distance(p)[0] for p in [
        (7.5, 91.4, -36.1),
    ]]
    chanfrein4_side_1 = [part.faces().sort_by_distance(p)[0] for p in [
        (7.5, 74.15, -36.1),
    ]]
    chanfrein4_edges_2 = [part.edges().sort_by_distance(p)[0] for p in [
        (-7.5, 91.4, -36.1),
    ]]
    chanfrein4_side_2 = [part.faces().sort_by_distance(p)[0] for p in [
        (-7.5, 74.15, -36.1),
    ]]
    chanfrein4 = BRepFilletAPI_MakeChamfer(part.part.solid().wrapped)
    for e in chanfrein4_edges_1:
        chanfrein4.Add(CHANFREIN4_SIZE, CHANFREIN4_SIZE2, e.wrapped, chanfrein4_side_1[0].wrapped)  # the first distance lies on this face
    for e in chanfrein4_edges_2:
        chanfrein4.Add(CHANFREIN4_SIZE, CHANFREIN4_SIZE2, e.wrapped, chanfrein4_side_2[0].wrapped)  # the first distance lies on this face
    add(Compound.cast(chanfrein4.Shape()), mode=Mode.REPLACE)

    # Chanfrein8: read off the stored shape, not the designer's step
    # Chanfrein8 outline → Chanfrein8 (add)
    with BuildSketch(Plane.XY.offset(CHANFREIN8_START)):
        Polygon((30.15, 31.35), (30.15, 41.4), (0, 41.4), align=None)
    extrude(amount=CHANFREIN8_DEPTH)

    # Chanfrein9
    chanfrein9_edges_1 = [part.edges().sort_by_distance(p)[0] for p in [
        (45, 47.4, -36.1),
    ]]
    chanfrein9_side_1 = [part.faces().sort_by_distance(p)[0] for p in [
        (45, 47.34, -36.1),
    ]]
    chanfrein9_edges_2 = [part.edges().sort_by_distance(p)[0] for p in [
        (-45, 47.4, -36.1),
    ]]
    chanfrein9_side_2 = [part.faces().sort_by_distance(p)[0] for p in [
        (-44.94, 47.4, -36.1),
    ]]
    chanfrein9 = BRepFilletAPI_MakeChamfer(part.part.solid().wrapped)
    for e in chanfrein9_edges_1:
        chanfrein9.Add(CHANFREIN9_SIZE - 0.0001, CHANFREIN9_SIZE_2 - 0.0001, e.wrapped, chanfrein9_side_1[0].wrapped)
    for e in chanfrein9_edges_2:
        chanfrein9.Add(CHANFREIN9_SIZE_2 - 0.0001, CHANFREIN9_SIZE - 0.0001, e.wrapped, chanfrein9_side_2[0].wrapped)
    add(Compound.cast(chanfrein9.Shape()), mode=Mode.REPLACE)  # a hair under: the kernel refuses the full size

    # Chanfrein10: read off the stored shape, not the designer's step
    # Chanfrein10 outline → Chanfrein10 (cut)
    with BuildSketch(Plane(origin=(0, 0, 0), x_dir=(1, 0, 0), z_dir=(0, 0.31622776601683705, -0.9486832980505141)).offset(CHANFREIN10_START)):
        with Locations((0, 6.008327554)):
            Rectangle(CHANFREIN10_OUTLINE_W, CHANFREIN10_OUTLINE_H)
    extrude(amount=CHANFREIN10_DEPTH, mode=Mode.SUBTRACT)

    # Congé9
    cong_9_edges = [part.edges().sort_by_distance(p)[0] for p in [
        (-33.65, 44.4, 45),
        (-33.65, 6.4, 40),
        (-37.575, 6.4, -27),
        (-33.65, 42.4, 40),
        (-33.65, 42.4, -27),
        (33.65, 6.4, 40),
        (33.65, 44.4, 45),
        (37.575, 6.4, -27),
        (33.65, 42.4, 40),
        (33.65, 42.4, -27),
    ]]
    fillet(cong_9_edges, radius=CONG_9_R)

    # Chanfrein13
    # the kernel refuses this chamfer: 31.5, 10.5 mm, written as the material it adds along each edge
    with BuildSketch(Plane(origin=(-30.15, 41.4, -27.2), x_dir=(0, -1, 0), z_dir=(0, 0, -1))) as chanfrein13_piece_1:
        with BuildLine():
            Line((10.898446985, 1.195340956), (-0.398446985, -32.695340956))
            Line((-0.398446985, -32.695340956), (-1.028446985, -32.695340956))
            ThreePointArc((-1.028446985, -32.695340956), (-0.63, -16.347670478), (-0.63, 0))
            Line((-0.63, 0), (0, 0.63))
            ThreePointArc((0, 0.63), (5.449223493, 0.63), (10.898446985, 1.825340956))
            Line((10.898446985, 1.825340956), (10.898446985, 1.195340956))
        make_face()
    extrude(amount=17.8)

    # Esquisse37 → Enlèv. mat.-Extru.8 (cut)
    with BuildSketch(Plane.XZ):
        with Locations(Location((-25.45, 6, 0), (0, 0, 270))):
            Circle(ESQUISSE37_R)
        with Locations(Location((25.45, 6, 0), (0, 0, 270))):
            Circle(ESQUISSE37_R)
    extrude(amount=-ENL_V_MAT_EXTRU_8_DEPTH, mode=Mode.SUBTRACT)

    # Esquisse38 → Boss.-Extru.15 (add)
    with BuildSketch(Plane.XY.offset(-27.2)):
        Polygon((0.675, 41.175), (-21.95, 33.64), (23.28, 33.64), align=None)
    extrude(amount=-BOSS_EXTRU_15_DEPTH)

    # Congé11
    cong_11_edges = [part.edges().sort_by_distance(p)[0] for p in [
        (7.5, 56.9, -36.1),
        (-7.5, 56.9, -36.1),
        (-25, 91.4, -36.1),
        (-7.5, 81.4, -36.1),
        (25, 91.4, -36.1),
        (7.5, 81.4, -36.1),
        (30.15, 31.35, -38.5),
        (-30.15, 30.9, -38.5),
        (0.675, 41.175, -38.5),
    ]]
    fillet(cong_11_edges, radius=CONG_11_R)

    # Chanfrein14
    chanfrein14_edges = [part.edges().sort_by_distance(p)[0] for p in [
        (0, 95.4, -27.2),
    ]]
    chanfrein14_side = [part.faces().sort_by_distance(p)[0] for p in [
        (0, 95.4, 8.9),
    ]]
    chamfer(chanfrein14_edges, length=CHANFREIN14_SIZE, length2=CHANFREIN14_SIZE2, reference=chanfrein14_side[0])

    # Esquisse40 → Enlèv. mat.-Extru.9 (cut)
    with BuildSketch(Plane(origin=(0, 103, 0), x_dir=(1, 0, 0), z_dir=(0, 1, 0))):
        Rectangle(ESQUISSE40_W, ESQUISSE40_H)
    extrude(amount=-ENL_V_MAT_EXTRU_9_DEPTH, mode=Mode.SUBTRACT)

    # Esquisse41 → Enlèv. mat.-Extru.11 (cut)
    with BuildSketch(Plane(origin=(0, 79, 0), x_dir=(1, 0, 0), z_dir=(0, 1, 0))):
        with Locations((0, 36.1)):
            Rectangle(ESQUISSE41_W, ESQUISSE41_H)
    extrude(amount=-ENL_V_MAT_EXTRU_11_DEPTH, mode=Mode.SUBTRACT)

    # Esquisse42 → Boss.-Extru.16 (add)
    # profile 1 of 4: a face of its own
    with BuildSketch(Plane(origin=(0, 6.4, 0), x_dir=(1, 0, 0), z_dir=(0, 1, 0)).offset(BOSS_EXTRU_16_START)):
        with BuildLine():
            Line((-45, 49), (-45, 45))
            Line((-45, 45), (-33, 45))
            Line((-33, 45), (-33, 49))
            ThreePointArc((-33, 49), (-34.757359313, 53.242640687), (-39, 55))
            ThreePointArc((-39, 55), (-43.242640687, 53.242640687), (-45, 49))
        make_face()
        with Locations(Location((-39, 50, 0), (0, 0, 270))):
            Circle(ESQUISSE42_R, mode=Mode.SUBTRACT)
    # profile 2 of 4: a face of its own
    with BuildSketch(Plane(origin=(0, 6.4, 0), x_dir=(1, 0, 0), z_dir=(0, 1, 0)).offset(BOSS_EXTRU_16_START)):
        with BuildLine():
            Line((33, 49), (33, 45))
            Line((33, 45), (45, 45))
            Line((45, 45), (45, 49))
            ThreePointArc((45, 49), (43.242640687, 53.242640687), (39, 55))
            ThreePointArc((39, 55), (34.757359313, 53.242640687), (33, 49))
        make_face()
        with Locations(Location((39, 50, 0), (0, 0, 270))):
            Circle(ESQUISSE42_R, mode=Mode.SUBTRACT)
    # profile 3 of 4: a face of its own
    with BuildSketch(Plane(origin=(0, 6.4, 0), x_dir=(1, 0, 0), z_dir=(0, 1, 0)).offset(BOSS_EXTRU_16_START)):
        with BuildLine():
            Line((49, -5), (45, -5))
            Line((45, -5), (45, -17))
            Line((45, -17), (49, -17))
            ThreePointArc((49, -17), (53.242640687, -15.242640687), (55, -11))
            ThreePointArc((55, -11), (53.242640687, -6.757359313), (49, -5))
        make_face()
        with Locations(Location((50, -11, 0), (0, 0, 270))):
            Circle(ESQUISSE42_R, mode=Mode.SUBTRACT)
    # profile 4 of 4: a face of its own
    with BuildSketch(Plane(origin=(0, 6.4, 0), x_dir=(1, 0, 0), z_dir=(0, 1, 0)).offset(BOSS_EXTRU_16_START)):
        with BuildLine():
            Line((-49, -5), (-45, -5))
            Line((-45, -5), (-45, -17))
            Line((-45, -17), (-49, -17))
            ThreePointArc((-49, -17), (-53.242640687, -15.242640687), (-55, -11))
            ThreePointArc((-55, -11), (-53.242640687, -6.757359313), (-49, -5))
        make_face()
        with Locations(Location((-50, -11, 0), (0, 0, 270))):
            Circle(ESQUISSE42_R, mode=Mode.SUBTRACT)
    extrude(amount=-BOSS_EXTRU_16_DEPTH)


solid = part.part
